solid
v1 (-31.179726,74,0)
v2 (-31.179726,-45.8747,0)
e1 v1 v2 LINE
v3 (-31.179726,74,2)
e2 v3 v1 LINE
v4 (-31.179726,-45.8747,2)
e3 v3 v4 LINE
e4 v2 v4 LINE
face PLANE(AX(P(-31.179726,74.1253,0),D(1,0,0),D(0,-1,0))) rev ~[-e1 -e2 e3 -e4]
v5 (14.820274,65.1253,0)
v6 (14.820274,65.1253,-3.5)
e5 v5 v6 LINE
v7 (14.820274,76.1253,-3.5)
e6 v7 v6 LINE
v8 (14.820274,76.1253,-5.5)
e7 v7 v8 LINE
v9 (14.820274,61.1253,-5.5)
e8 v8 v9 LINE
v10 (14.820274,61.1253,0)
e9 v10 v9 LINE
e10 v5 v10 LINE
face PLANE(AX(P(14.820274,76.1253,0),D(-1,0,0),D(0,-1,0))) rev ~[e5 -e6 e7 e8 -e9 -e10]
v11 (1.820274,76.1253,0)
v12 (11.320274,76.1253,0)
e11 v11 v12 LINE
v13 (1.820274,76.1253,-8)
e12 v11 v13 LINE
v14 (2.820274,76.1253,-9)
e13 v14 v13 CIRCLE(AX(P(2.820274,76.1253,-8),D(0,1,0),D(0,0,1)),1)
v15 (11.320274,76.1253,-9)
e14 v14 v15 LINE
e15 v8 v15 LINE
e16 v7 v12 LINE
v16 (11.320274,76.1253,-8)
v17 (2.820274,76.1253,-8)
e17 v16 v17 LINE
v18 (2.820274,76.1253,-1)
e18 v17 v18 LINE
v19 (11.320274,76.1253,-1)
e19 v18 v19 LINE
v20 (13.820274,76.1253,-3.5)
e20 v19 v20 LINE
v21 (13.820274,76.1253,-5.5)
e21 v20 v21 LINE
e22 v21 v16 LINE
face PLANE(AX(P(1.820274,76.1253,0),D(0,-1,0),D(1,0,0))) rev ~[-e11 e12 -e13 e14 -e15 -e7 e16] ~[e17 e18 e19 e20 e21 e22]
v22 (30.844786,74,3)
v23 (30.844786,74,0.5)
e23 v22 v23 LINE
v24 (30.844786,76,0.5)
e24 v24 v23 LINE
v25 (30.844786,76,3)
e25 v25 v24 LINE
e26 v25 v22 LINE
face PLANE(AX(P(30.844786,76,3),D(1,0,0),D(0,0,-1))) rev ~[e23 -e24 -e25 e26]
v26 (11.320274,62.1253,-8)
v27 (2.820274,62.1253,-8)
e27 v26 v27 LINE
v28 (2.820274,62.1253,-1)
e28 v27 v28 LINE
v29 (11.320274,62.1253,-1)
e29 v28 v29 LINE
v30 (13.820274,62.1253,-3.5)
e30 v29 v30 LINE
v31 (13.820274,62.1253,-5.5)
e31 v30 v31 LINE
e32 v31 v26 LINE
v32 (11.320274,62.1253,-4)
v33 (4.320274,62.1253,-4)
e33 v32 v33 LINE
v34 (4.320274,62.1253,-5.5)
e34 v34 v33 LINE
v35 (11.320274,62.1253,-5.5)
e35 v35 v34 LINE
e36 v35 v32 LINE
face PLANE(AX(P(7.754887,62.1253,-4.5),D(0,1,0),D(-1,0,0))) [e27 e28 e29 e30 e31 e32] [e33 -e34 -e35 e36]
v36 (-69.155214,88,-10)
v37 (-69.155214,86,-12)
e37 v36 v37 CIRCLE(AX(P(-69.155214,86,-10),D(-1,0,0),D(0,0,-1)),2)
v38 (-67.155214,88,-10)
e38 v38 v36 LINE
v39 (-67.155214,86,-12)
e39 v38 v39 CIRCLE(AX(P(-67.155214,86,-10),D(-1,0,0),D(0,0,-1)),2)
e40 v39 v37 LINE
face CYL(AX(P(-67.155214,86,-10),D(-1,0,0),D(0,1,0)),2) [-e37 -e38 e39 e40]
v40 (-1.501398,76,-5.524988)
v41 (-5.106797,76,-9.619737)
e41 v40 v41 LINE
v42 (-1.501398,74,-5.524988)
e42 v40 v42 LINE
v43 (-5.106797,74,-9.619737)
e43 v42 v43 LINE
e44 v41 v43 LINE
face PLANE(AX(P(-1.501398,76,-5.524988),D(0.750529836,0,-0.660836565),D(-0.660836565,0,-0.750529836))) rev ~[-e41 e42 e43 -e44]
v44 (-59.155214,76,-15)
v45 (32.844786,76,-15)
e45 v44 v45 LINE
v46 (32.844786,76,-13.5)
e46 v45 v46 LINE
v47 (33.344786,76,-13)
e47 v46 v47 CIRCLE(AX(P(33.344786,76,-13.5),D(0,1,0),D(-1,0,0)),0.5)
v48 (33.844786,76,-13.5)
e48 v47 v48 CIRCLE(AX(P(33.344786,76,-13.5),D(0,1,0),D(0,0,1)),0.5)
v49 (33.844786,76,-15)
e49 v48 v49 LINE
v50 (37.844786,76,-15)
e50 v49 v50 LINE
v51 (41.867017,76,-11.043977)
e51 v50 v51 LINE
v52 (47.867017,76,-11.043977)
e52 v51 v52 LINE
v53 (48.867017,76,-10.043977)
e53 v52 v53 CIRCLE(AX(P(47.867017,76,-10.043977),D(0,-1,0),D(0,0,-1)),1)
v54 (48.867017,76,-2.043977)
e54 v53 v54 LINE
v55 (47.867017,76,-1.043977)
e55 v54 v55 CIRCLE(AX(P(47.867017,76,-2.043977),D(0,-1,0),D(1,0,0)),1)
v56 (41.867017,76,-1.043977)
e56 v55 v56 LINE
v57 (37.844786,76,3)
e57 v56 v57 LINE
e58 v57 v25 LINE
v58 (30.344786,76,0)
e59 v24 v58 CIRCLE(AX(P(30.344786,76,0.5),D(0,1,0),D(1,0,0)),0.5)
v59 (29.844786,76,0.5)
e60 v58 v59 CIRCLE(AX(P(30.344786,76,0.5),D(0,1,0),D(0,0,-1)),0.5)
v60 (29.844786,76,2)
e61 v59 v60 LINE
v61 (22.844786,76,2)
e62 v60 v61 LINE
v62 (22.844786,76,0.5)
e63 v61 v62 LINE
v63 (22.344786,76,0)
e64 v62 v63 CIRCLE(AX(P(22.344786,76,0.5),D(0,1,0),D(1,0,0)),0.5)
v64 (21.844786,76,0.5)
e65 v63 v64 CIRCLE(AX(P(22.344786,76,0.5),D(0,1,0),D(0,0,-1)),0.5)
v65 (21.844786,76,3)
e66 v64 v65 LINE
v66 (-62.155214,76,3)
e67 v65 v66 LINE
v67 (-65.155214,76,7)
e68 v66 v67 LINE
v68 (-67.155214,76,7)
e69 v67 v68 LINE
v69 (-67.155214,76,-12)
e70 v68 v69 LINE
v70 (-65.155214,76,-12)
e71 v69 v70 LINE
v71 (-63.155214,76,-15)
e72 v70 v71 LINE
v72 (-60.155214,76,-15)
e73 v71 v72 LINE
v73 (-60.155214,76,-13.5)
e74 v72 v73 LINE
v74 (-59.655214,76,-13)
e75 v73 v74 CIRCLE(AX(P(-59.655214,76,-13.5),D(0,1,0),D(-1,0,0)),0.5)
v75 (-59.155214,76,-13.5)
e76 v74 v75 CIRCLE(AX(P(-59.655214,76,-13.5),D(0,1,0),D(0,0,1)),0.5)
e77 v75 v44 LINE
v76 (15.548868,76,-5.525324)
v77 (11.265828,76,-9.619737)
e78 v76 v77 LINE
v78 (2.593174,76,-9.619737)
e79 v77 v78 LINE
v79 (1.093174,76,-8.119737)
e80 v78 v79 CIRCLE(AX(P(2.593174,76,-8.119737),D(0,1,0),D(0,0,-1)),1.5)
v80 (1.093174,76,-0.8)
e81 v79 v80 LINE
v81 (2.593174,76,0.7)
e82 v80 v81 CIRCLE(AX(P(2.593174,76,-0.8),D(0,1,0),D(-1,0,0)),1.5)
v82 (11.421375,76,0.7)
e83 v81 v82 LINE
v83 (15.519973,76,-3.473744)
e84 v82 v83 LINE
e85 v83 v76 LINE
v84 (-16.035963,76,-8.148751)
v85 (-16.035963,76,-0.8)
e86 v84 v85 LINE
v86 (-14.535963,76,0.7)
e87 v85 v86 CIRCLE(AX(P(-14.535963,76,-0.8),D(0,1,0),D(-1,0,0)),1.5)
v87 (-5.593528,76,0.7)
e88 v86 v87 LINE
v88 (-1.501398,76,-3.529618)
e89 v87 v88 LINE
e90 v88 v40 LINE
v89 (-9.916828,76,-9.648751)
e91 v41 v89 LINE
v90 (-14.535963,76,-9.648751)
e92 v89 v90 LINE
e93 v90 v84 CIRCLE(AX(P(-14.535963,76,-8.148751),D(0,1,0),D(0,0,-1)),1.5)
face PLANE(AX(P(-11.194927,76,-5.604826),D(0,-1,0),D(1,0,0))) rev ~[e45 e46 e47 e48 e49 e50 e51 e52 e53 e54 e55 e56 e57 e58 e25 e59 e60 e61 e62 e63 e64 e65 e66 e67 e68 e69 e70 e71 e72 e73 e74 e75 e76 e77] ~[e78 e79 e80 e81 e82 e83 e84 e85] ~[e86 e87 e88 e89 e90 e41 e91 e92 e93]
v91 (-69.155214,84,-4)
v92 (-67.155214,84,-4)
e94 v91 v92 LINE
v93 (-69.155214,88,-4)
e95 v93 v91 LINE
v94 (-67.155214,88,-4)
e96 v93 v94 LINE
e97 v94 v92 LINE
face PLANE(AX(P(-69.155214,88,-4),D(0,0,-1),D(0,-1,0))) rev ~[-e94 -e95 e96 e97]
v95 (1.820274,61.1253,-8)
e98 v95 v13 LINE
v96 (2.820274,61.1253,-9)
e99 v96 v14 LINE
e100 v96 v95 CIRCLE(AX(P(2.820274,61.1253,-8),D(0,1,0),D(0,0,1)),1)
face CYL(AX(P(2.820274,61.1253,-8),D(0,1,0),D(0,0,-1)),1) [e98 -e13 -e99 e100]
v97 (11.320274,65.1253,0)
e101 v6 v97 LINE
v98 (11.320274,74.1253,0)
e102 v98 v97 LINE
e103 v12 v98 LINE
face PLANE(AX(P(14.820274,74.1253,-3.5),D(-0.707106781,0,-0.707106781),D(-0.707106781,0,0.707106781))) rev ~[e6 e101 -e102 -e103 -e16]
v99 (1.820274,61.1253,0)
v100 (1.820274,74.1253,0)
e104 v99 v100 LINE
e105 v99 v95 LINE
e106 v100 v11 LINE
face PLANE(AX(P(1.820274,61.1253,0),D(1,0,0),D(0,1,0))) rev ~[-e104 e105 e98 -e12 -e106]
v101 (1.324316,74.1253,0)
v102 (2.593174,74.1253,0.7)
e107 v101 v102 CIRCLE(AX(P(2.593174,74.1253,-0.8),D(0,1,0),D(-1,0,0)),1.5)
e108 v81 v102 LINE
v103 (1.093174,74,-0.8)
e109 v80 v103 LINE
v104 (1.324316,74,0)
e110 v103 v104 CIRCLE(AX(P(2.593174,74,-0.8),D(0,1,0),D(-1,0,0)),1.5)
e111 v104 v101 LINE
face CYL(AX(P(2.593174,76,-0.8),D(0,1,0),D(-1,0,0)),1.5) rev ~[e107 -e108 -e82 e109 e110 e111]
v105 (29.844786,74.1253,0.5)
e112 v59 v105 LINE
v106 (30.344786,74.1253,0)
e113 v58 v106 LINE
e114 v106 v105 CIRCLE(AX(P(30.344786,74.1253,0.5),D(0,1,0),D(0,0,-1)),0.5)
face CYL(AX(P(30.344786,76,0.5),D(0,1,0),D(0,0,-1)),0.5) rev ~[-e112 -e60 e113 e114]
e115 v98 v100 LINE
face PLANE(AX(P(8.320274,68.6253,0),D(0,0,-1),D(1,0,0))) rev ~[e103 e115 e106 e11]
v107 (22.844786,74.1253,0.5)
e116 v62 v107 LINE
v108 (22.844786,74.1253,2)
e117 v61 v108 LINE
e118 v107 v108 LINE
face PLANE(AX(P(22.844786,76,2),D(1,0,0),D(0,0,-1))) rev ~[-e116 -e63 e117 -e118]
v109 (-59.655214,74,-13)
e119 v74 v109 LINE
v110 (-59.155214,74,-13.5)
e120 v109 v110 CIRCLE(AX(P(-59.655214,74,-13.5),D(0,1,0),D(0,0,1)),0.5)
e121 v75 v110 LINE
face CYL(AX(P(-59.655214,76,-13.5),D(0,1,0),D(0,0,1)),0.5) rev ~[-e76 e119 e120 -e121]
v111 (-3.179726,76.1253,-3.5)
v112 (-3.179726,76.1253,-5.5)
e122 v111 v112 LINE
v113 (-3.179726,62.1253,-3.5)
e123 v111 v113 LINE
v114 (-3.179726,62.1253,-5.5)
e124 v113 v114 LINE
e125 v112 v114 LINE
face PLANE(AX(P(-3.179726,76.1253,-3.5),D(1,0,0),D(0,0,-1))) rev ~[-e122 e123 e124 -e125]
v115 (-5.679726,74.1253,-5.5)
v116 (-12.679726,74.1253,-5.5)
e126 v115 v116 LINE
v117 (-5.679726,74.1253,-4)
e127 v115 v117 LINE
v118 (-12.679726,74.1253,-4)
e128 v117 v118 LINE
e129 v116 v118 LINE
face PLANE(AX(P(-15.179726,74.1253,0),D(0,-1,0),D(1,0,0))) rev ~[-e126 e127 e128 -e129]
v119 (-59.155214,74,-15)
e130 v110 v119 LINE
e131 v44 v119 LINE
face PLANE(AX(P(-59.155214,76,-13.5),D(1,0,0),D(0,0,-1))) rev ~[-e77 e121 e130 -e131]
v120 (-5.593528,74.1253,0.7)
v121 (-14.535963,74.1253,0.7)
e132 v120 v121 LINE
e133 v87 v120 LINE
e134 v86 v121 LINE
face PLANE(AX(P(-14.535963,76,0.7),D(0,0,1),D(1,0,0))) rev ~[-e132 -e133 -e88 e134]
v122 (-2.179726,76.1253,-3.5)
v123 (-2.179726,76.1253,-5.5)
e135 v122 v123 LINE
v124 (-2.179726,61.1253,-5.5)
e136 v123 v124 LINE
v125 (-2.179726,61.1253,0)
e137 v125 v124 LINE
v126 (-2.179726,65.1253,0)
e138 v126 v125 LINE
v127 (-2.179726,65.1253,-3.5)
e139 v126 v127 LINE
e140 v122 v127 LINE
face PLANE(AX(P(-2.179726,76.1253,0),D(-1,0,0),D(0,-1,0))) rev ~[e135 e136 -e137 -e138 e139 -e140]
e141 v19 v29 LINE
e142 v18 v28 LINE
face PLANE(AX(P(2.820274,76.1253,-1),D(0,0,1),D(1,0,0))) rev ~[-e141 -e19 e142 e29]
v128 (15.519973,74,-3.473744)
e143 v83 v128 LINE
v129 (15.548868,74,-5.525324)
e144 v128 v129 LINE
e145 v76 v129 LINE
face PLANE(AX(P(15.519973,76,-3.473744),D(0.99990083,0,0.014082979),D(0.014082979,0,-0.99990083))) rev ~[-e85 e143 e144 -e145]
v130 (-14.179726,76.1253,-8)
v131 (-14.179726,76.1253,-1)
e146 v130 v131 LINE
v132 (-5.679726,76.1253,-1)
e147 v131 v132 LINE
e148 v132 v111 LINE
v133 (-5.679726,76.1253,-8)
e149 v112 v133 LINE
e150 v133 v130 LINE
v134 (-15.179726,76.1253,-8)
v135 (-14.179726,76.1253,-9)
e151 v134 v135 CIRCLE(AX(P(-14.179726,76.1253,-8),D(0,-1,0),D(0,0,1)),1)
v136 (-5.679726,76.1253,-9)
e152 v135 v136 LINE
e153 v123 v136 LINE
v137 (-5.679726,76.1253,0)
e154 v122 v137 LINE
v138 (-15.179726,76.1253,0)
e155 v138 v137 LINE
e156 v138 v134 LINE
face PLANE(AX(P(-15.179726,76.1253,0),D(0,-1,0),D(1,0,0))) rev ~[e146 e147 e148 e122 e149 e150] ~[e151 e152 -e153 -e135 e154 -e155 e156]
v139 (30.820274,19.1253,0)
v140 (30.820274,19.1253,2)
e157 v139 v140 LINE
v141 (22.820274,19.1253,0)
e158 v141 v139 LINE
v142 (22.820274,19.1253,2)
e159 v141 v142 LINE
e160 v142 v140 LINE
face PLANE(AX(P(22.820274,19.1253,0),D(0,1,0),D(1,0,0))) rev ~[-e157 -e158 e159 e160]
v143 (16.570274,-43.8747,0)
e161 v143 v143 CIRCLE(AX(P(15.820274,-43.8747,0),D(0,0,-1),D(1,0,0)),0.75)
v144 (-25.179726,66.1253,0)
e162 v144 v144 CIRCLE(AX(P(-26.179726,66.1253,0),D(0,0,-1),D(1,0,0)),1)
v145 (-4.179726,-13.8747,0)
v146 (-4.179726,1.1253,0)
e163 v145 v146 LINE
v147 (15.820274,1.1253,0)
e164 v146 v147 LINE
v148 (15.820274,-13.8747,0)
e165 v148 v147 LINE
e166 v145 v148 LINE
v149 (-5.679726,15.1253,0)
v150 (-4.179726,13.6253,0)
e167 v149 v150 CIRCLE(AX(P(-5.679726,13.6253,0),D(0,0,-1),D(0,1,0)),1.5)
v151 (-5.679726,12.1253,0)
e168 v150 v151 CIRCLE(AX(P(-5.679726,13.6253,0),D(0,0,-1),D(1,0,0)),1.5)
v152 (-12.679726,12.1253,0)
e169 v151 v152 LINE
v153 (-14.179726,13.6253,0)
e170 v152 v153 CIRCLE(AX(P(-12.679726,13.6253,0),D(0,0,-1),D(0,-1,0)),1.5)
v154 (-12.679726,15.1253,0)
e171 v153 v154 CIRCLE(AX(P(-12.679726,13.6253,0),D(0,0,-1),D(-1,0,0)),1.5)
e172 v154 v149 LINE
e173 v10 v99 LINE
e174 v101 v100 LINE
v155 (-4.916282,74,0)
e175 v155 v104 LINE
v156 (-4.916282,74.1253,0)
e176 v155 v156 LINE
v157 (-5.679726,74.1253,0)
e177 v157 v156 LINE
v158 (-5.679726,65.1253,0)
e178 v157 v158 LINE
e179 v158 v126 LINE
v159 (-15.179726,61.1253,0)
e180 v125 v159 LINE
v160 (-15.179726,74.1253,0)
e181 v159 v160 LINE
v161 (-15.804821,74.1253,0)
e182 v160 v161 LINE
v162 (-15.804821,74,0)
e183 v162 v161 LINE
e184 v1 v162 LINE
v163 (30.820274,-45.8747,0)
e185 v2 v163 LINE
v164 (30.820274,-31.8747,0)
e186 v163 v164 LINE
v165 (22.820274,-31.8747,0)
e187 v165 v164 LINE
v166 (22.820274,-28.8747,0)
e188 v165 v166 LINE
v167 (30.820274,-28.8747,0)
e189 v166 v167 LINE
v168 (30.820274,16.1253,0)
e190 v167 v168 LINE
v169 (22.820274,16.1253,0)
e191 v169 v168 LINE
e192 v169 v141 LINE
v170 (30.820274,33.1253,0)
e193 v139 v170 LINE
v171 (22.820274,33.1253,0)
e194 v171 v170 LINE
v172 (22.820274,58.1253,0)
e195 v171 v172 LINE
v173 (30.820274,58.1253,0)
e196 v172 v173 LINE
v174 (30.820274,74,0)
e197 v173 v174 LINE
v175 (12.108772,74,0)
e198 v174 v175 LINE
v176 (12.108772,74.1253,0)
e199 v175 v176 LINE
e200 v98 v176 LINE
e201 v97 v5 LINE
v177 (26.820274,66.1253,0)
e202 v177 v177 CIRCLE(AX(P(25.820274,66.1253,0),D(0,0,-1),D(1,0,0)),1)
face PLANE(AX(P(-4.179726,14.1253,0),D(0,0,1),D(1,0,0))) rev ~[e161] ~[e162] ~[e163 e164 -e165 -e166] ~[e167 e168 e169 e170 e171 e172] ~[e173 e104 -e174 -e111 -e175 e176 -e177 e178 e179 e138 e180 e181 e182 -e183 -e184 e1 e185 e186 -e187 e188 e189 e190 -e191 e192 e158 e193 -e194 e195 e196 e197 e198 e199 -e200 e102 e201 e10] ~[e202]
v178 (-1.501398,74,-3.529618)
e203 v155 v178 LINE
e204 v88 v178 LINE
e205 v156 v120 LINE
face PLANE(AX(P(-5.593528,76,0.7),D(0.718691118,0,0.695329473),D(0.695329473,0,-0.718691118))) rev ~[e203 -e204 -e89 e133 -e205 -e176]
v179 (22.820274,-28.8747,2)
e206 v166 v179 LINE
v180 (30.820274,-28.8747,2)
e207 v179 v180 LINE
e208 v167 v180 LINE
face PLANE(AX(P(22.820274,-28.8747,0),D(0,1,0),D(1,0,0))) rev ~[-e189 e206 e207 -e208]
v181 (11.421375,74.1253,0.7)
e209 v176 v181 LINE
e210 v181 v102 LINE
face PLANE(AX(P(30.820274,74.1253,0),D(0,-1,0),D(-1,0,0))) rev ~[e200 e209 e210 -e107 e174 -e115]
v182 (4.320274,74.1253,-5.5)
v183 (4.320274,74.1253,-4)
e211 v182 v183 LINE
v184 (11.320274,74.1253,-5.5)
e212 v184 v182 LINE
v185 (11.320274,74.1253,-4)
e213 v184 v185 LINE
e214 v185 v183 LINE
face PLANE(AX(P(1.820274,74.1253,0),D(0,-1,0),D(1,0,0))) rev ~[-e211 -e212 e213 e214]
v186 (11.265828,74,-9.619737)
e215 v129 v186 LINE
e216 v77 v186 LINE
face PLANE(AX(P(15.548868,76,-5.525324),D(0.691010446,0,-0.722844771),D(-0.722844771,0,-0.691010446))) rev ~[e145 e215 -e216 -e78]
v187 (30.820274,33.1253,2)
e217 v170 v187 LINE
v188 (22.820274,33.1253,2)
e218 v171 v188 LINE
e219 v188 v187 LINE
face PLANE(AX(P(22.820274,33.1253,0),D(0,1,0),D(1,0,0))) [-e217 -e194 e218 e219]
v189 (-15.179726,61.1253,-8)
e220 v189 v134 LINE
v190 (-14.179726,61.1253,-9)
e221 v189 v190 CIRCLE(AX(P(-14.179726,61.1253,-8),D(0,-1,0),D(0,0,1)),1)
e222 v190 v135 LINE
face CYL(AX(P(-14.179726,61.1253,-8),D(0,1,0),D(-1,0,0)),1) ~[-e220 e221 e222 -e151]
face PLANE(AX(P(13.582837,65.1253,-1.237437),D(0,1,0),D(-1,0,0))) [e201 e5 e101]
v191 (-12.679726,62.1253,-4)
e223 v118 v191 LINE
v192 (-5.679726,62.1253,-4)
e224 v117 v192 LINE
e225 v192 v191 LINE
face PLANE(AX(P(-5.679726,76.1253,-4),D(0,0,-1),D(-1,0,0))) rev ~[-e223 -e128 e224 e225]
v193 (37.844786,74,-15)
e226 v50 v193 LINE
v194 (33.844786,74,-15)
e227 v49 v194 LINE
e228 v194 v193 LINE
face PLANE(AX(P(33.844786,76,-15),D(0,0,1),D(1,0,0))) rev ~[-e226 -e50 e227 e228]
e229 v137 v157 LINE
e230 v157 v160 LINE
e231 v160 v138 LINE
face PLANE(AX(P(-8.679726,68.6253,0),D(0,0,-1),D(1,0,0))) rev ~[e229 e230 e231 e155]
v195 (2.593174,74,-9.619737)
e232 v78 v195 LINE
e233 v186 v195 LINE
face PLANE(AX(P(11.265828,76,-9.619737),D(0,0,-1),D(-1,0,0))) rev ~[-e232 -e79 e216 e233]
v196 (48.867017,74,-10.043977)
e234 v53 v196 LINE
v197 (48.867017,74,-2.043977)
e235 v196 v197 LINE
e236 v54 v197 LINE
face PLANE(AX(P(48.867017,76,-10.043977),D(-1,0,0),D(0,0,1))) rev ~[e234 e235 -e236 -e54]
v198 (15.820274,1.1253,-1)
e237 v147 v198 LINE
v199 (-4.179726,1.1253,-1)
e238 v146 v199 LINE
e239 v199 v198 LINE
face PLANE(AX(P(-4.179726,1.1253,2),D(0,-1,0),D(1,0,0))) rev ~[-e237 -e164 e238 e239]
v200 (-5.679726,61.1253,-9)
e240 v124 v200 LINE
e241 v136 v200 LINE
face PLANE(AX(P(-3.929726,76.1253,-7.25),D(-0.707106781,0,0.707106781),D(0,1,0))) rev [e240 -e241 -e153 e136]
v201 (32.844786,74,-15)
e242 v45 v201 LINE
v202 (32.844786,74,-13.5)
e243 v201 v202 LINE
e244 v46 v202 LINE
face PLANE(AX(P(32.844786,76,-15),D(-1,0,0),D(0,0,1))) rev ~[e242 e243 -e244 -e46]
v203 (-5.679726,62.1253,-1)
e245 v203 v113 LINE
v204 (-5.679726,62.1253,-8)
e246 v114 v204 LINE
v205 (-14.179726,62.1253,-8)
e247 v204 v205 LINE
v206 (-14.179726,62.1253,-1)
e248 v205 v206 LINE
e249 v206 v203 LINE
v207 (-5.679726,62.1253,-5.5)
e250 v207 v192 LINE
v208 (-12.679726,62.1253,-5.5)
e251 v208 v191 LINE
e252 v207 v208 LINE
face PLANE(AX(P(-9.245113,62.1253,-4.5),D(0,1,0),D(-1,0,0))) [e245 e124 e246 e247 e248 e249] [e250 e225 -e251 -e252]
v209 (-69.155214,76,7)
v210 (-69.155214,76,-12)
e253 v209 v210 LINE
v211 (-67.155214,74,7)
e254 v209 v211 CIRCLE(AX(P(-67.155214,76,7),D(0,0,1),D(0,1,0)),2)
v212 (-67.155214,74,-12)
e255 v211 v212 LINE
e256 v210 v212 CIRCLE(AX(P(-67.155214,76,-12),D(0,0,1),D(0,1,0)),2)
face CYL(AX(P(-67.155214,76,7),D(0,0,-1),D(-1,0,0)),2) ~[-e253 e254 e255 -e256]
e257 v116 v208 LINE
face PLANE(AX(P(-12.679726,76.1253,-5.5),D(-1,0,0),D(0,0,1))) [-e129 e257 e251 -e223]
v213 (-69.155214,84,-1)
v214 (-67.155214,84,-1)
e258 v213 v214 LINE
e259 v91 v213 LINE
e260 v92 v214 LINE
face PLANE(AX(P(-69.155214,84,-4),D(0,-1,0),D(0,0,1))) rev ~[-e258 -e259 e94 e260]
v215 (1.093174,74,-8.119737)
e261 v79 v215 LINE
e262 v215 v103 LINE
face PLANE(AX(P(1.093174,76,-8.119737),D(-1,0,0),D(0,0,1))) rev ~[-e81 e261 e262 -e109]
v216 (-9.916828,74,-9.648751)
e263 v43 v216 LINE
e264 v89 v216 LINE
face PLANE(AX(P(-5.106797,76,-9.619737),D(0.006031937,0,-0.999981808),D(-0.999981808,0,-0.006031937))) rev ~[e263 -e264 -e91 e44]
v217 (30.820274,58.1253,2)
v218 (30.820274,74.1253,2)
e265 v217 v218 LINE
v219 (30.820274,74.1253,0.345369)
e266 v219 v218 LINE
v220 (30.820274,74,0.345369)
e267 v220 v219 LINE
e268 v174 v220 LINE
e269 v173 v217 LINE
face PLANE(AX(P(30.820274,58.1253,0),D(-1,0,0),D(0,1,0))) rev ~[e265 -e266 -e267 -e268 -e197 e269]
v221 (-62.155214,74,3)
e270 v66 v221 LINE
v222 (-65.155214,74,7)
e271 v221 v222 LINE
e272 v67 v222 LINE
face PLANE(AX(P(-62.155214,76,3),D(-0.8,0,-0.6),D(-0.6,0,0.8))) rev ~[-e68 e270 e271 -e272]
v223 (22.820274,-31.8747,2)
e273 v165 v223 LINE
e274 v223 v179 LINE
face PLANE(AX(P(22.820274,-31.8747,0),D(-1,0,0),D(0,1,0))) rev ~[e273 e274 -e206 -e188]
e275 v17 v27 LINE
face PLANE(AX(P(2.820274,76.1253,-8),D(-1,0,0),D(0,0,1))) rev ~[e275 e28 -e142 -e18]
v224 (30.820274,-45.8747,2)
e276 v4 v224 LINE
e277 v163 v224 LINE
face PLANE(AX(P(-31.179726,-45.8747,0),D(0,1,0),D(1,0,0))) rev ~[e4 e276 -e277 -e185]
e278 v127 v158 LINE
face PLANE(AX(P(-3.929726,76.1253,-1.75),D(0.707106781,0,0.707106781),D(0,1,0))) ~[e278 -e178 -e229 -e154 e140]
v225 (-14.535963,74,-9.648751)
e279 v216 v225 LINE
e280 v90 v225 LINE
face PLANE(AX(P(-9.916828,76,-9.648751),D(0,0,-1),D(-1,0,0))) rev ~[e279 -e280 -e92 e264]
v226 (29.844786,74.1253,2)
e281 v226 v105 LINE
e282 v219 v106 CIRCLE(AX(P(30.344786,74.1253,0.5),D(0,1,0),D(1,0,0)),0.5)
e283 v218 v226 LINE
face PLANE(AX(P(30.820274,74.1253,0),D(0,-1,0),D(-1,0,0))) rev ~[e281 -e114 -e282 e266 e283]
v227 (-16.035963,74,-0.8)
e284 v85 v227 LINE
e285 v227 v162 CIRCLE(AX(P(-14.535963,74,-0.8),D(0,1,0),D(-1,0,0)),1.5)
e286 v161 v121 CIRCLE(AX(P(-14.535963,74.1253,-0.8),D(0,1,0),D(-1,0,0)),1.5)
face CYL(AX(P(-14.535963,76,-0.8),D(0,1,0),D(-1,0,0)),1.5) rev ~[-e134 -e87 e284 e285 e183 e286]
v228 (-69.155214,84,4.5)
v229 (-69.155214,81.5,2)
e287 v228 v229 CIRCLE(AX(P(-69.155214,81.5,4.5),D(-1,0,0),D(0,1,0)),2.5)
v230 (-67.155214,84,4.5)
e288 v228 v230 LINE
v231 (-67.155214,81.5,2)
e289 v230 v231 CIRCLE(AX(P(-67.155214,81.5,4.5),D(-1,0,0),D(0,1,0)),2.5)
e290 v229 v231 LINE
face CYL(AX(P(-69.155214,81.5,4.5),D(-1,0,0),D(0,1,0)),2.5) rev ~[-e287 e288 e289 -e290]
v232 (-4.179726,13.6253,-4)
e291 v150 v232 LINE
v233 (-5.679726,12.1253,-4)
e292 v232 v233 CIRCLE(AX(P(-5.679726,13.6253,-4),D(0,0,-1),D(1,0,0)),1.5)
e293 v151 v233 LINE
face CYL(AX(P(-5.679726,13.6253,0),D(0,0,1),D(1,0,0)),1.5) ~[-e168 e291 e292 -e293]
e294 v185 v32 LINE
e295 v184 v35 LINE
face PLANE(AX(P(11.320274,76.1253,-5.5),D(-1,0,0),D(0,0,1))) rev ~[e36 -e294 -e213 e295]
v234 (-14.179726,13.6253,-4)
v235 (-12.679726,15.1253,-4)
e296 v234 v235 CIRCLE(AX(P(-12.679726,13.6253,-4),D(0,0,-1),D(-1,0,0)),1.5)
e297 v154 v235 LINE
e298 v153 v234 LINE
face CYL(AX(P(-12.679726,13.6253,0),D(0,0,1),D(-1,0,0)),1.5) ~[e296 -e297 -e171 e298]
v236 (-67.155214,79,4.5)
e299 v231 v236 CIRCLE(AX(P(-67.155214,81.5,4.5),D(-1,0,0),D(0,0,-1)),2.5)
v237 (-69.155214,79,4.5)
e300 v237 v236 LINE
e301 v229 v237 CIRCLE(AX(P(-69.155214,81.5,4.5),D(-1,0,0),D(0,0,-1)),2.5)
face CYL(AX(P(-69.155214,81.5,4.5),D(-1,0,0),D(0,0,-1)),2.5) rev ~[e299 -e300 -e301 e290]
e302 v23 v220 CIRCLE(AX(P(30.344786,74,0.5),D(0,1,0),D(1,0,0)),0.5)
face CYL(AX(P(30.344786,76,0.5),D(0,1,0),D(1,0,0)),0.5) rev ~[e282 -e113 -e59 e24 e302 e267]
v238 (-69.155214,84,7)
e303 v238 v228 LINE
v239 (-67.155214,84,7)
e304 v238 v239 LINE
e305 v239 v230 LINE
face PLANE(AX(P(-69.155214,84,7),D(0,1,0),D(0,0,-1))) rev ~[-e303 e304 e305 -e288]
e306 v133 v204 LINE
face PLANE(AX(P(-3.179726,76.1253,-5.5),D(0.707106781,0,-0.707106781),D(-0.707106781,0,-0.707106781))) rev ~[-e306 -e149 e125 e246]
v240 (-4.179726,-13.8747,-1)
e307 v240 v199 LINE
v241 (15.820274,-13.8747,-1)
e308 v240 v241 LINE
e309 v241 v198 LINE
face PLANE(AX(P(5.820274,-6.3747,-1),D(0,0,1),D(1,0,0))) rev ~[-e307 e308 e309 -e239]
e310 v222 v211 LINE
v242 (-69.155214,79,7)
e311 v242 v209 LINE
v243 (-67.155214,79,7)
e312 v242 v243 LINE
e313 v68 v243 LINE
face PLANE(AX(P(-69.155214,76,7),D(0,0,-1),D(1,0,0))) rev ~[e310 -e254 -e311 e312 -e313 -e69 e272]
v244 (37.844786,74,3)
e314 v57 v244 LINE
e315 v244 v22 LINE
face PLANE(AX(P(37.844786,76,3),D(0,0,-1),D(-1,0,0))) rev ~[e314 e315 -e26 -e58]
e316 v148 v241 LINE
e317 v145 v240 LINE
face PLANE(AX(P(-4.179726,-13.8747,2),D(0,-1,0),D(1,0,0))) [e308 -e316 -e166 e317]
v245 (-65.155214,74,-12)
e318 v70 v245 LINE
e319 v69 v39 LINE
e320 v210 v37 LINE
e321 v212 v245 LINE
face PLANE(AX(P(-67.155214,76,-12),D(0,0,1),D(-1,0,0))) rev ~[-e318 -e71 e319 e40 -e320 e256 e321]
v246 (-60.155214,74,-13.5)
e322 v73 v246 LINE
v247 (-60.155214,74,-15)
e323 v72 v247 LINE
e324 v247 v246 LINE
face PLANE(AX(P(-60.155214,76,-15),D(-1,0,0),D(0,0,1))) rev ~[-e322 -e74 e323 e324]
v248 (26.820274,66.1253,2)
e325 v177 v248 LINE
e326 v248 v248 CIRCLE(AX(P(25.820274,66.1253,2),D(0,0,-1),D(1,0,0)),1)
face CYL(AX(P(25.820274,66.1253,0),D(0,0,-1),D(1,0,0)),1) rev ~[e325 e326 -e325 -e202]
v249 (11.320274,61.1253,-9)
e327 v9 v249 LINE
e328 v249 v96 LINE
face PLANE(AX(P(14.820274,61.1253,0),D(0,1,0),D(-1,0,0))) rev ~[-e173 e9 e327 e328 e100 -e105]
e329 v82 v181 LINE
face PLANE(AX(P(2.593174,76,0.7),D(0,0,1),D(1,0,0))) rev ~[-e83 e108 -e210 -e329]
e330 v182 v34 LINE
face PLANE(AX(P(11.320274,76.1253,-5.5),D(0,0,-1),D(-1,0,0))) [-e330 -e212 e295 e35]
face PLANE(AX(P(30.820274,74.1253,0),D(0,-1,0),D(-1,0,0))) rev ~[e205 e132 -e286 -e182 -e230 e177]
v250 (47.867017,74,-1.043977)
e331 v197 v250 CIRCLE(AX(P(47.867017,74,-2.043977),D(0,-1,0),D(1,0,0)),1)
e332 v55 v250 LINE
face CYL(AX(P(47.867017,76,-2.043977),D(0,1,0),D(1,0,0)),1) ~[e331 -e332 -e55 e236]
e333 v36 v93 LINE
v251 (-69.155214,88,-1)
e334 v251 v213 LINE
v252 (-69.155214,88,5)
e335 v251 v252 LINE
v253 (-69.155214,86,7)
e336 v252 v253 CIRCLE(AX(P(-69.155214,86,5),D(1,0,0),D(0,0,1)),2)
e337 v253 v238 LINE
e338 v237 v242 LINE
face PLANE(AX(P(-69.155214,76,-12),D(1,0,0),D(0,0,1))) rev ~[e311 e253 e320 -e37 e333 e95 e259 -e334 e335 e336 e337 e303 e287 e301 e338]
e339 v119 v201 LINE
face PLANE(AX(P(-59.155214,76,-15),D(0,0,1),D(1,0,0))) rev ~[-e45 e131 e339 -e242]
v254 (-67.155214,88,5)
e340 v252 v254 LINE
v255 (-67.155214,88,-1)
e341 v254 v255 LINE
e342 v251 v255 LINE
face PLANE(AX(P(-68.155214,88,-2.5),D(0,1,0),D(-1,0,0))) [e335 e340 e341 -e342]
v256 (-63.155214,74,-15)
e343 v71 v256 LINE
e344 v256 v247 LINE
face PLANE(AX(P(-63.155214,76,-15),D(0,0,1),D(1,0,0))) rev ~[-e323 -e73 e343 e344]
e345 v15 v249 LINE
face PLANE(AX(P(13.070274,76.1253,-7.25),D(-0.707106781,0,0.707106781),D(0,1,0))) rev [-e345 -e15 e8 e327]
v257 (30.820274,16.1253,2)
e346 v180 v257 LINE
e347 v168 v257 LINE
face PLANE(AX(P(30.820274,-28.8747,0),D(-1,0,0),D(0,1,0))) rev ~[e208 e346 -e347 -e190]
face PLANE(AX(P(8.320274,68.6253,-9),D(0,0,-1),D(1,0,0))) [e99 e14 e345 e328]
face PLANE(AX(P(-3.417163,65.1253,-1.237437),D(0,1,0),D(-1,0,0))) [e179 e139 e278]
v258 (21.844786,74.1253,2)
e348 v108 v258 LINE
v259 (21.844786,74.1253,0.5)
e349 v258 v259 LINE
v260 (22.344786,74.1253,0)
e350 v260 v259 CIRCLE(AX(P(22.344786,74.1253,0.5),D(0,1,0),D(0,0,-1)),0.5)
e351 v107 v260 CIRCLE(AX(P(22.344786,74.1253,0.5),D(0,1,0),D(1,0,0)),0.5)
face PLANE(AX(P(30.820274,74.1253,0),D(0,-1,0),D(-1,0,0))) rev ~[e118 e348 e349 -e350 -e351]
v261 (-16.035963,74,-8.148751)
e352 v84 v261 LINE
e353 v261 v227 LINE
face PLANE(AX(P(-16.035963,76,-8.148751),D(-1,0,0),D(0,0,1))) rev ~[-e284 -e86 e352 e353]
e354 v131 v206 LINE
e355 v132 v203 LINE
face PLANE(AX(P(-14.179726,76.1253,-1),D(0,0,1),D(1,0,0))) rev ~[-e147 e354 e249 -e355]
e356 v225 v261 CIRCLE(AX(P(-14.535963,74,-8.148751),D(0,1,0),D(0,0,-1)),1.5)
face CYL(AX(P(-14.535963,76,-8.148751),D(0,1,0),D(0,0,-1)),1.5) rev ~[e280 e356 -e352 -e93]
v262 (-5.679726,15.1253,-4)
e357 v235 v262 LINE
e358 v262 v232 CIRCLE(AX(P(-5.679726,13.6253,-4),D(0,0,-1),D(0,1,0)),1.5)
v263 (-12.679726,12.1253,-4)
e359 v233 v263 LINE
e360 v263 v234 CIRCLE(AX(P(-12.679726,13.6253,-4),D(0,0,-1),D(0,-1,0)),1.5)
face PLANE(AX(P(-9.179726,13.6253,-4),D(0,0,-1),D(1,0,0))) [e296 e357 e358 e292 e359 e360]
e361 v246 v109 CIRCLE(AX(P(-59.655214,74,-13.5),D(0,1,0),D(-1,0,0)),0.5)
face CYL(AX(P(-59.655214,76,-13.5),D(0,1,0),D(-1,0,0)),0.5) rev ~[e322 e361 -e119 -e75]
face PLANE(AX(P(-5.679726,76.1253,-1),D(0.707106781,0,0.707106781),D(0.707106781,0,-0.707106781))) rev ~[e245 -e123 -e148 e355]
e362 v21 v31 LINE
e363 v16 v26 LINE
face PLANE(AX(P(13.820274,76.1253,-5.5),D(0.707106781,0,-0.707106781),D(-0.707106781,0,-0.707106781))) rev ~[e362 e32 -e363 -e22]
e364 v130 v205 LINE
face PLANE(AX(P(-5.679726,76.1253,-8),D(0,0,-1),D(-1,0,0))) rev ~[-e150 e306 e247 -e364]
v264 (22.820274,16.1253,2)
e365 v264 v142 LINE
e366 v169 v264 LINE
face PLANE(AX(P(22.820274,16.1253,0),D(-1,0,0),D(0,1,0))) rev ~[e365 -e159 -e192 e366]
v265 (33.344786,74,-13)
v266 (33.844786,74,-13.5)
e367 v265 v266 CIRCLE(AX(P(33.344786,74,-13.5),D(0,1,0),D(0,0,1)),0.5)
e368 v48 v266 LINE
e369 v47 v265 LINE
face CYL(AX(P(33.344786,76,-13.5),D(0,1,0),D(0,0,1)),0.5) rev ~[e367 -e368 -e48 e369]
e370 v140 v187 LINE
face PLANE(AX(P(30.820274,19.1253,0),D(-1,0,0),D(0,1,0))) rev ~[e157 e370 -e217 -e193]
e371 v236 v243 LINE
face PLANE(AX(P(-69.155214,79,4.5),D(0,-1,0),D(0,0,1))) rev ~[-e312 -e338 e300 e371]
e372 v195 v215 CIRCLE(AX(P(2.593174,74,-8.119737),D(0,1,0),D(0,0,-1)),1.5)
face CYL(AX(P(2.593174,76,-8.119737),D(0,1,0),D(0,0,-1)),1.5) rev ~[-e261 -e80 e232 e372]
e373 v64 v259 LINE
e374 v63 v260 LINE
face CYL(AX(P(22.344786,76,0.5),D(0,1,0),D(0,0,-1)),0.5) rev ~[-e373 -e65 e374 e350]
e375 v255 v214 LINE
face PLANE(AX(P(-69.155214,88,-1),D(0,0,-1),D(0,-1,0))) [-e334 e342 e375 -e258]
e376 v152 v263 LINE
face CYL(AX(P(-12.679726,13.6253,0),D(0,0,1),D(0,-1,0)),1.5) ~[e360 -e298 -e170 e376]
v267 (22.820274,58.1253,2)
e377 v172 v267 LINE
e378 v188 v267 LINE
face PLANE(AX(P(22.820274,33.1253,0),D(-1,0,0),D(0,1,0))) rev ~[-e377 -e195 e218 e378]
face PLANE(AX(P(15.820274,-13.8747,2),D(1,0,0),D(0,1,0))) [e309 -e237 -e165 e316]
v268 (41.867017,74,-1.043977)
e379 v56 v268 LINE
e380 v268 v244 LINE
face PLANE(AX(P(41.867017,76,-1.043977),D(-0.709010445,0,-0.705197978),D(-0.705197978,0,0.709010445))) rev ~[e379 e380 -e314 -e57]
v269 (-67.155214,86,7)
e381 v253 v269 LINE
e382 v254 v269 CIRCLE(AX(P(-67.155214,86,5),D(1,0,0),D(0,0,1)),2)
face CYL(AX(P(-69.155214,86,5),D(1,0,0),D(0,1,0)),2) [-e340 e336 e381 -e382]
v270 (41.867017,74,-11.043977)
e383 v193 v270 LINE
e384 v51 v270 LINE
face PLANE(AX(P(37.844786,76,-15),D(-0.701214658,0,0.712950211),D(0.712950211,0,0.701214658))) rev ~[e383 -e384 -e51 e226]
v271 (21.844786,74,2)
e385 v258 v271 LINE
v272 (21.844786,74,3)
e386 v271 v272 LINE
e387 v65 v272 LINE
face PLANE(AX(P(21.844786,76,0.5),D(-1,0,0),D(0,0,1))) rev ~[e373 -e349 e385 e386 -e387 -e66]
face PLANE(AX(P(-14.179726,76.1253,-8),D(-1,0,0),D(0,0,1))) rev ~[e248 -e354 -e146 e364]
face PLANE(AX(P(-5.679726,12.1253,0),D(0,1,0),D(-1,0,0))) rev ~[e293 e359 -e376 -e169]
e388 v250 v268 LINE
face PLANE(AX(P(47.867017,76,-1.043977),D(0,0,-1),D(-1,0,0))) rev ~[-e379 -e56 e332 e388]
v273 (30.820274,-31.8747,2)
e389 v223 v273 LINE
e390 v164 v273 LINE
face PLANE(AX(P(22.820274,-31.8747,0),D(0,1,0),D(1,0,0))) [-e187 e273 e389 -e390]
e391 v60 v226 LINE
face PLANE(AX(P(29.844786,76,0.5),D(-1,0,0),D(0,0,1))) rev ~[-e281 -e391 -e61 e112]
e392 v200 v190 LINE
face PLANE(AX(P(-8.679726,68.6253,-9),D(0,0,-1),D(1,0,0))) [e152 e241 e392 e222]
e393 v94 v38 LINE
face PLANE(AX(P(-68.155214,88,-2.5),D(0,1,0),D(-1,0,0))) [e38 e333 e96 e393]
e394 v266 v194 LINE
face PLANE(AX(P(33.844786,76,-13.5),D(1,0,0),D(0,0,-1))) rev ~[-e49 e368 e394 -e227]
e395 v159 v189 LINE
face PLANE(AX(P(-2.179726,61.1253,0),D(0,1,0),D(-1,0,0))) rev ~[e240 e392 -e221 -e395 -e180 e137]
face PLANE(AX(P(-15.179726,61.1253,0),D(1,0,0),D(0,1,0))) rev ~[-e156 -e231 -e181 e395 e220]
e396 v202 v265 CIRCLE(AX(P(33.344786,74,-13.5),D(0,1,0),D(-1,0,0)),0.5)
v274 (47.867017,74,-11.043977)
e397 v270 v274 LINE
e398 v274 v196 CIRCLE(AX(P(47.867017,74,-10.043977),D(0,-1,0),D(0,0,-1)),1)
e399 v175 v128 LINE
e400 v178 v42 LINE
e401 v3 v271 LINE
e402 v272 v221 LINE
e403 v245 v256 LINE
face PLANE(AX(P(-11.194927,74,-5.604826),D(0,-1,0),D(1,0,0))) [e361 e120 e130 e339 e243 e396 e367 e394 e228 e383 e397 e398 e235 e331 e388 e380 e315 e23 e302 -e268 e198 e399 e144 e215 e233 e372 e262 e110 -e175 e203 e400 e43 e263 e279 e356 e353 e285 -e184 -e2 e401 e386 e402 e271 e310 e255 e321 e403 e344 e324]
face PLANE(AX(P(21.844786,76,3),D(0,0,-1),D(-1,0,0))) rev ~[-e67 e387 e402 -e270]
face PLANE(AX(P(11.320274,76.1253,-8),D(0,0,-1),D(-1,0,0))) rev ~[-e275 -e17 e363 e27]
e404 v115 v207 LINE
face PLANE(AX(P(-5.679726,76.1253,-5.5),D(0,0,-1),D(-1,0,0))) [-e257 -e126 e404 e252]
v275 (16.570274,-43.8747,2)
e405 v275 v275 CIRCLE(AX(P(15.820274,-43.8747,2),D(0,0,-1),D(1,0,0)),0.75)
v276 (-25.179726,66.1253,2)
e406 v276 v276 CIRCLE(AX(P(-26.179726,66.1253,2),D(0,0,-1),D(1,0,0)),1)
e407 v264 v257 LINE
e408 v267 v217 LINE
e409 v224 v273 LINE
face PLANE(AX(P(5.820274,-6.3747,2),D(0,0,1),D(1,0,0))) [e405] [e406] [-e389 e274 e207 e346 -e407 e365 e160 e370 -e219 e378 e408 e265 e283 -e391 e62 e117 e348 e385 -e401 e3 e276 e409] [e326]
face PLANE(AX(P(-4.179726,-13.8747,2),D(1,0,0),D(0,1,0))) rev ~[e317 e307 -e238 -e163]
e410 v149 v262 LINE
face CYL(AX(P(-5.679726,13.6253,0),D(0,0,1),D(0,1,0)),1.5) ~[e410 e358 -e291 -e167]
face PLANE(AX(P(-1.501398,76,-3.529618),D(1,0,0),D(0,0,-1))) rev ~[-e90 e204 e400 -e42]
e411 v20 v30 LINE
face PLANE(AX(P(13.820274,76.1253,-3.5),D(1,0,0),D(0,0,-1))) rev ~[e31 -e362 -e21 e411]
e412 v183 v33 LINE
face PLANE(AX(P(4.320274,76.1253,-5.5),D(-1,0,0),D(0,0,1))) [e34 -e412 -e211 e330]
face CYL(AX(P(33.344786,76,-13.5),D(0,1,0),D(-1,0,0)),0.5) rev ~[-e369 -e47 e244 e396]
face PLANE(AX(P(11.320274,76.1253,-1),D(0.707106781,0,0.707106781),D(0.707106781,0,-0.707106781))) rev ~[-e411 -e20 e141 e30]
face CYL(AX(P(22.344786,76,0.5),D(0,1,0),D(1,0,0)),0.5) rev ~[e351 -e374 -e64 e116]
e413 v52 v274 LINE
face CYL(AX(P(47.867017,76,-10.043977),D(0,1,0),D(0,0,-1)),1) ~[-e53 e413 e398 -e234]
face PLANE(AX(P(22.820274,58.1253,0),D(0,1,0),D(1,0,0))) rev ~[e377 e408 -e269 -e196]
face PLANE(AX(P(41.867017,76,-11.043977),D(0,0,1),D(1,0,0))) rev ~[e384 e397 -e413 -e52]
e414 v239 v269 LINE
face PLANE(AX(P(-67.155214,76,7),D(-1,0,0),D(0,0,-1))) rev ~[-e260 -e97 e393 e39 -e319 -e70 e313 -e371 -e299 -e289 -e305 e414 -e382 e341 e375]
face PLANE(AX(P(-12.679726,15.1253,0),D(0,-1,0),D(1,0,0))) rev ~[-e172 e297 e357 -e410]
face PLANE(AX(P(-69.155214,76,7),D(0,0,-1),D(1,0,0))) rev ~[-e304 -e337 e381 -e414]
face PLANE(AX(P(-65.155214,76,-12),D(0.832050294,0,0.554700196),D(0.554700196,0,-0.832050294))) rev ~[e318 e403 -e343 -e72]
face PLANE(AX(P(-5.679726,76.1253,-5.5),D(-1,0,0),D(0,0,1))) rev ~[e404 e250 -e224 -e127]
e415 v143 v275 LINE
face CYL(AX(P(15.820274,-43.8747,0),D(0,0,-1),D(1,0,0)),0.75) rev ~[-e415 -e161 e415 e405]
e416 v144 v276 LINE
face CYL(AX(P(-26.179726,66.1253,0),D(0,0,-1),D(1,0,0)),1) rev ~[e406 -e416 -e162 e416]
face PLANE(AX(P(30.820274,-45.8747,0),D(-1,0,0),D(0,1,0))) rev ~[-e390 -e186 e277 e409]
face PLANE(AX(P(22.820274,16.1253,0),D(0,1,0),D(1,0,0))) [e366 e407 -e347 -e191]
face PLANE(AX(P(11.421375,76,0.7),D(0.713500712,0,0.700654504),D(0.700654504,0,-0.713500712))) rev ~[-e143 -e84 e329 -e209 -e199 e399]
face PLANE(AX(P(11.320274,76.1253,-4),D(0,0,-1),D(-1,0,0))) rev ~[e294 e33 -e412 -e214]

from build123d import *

# Parameters (mm, degrees)
F0_W      = 8
F0_H      = 16
F0_H_2    = 14
F0_H_3    = 45
F1_DEPTH  = 2
F2_W      = 20
F2_H      = 15
F3_DEPTH  = 3
F5_DEPTH  = 4
F6_R      = 0.75
F7_DEPTH  = 25
F8_R      = 1
F9_DEPTH  = 25
F11_DEPTH = 9
F12_SIZE  = 3.5
F13_SIZE  = 3.5
F14_R     = 1
F15_R     = 1
F17_W     = 7
F17_H     = 1.5
F18_DEPTH = 14
F19_DEPTH = 2
F20_W     = 7
F20_H     = 1.5
F21_DEPTH = 14
F22_DEPTH = 2
F24_DEPTH = 9
F26_DEPTH = 9
F29_DEPTH = 2
F31_DEPTH = 12
F32_R     = 2
F33_R     = 2
F34_W     = 4
F34_H     = 3
F35_DEPTH = 25
F37_DEPTH = 25


# Not quite as in the source:
# - two fillets or chamfers of one size are made in one step


with BuildPart() as f1:
    # F0 (on Top) → F1 (new body)
    with BuildSketch(Plane.XY):
        Polygon((22.8202738762, 74.1253000498), (-31.1797261238, 74.1253000498), (-31.1797261238, -45.8746999502), (22.8202738762, -45.8746999502), (22.8202738762, -31.8746999502), (22.8202738762, -28.8746999502), (22.8202738762, 16.1253000498), (22.8202738762, 19.1253000498), (22.8202738762, 33.1253000498), (22.8202738762, 58.1253000498), align=None)
        with Locations((26.8202738762, 66.1253000498)):
            Rectangle(F0_W, F0_H)
        with Locations((26.8202738762, -38.8746999502)):
            Rectangle(F0_W, F0_H_2)
        with Locations((26.8202738762, 26.1253000498)):
            Rectangle(F0_W, F0_H_2)
        with Locations((26.8202738762, -6.3746999502)):
            Rectangle(F0_W, F0_H_3)
    extrude(amount=F1_DEPTH)

    # F2 (on face) → F3 (join)
    with BuildSketch(Plane.XY.offset(2)):
        with Locations((5.8202738762, -6.3746999502)):
            Rectangle(F2_W, F2_H)
    extrude(amount=-F3_DEPTH)

    # F4 (on face) → F5 (join)
    with BuildSketch(Plane(origin=(0, 0, 0), x_dir=(1, 0, 0), z_dir=(0, 0, -1))):
        with BuildLine():
            ThreePointArc((-4.1797261238, -13.6253000498), (-4.619065952, -12.564639878), (-5.6797261238, -12.1253000498))
            Line((-5.6797261238, -12.1253000498), (-12.6797261238, -12.1253000498))
            ThreePointArc((-12.6797261238, -12.1253000498), (-13.7403862956, -12.564639878), (-14.1797261238, -13.6253000498))
            ThreePointArc((-14.1797261238, -13.6253000498), (-13.7403862956, -14.6859602216), (-12.6797261238, -15.1253000498))
            Line((-12.6797261238, -15.1253000498), (-5.6797261238, -15.1253000498))
            ThreePointArc((-5.6797261238, -15.1253000498), (-4.619065952, -14.6859602216), (-4.1797261238, -13.6253000498))
        make_face()
    extrude(amount=F5_DEPTH)

    # F6 (on face) → F7 (cut)
    with BuildSketch(Plane(origin=(0, 0, 0), x_dir=(1, 0, 0), z_dir=(0, 0, -1))):
        with Locations((15.8202738762, 43.8746999502)):
            Circle(F6_R)
    extrude(amount=-F7_DEPTH, mode=Mode.SUBTRACT)

    # F8 (on face) → F9 (cut)
    with BuildSketch(Plane(origin=(0, 0, 0), x_dir=(1, 0, 0), z_dir=(0, 0, -1))):
        with Locations((25.8202738762, -66.1253000498)):
            Circle(F8_R)
        with Locations((-26.1797261238, -66.1253000498)):
            Circle(F8_R)
    extrude(amount=-F9_DEPTH, mode=Mode.SUBTRACT)

    # F10 (on face) → F11 (join)
    with BuildSketch(Plane(origin=(0, 0, 0), x_dir=(1, 0, 0), z_dir=(0, 0, -1))):
        Polygon((14.8202738762, -76.1253000498), (14.8202738762, -74.1253000498), (14.8202738762, -61.1253000498), (1.8202738762, -61.1253000498), (1.8202738762, -74.1253000498), (1.8202738762, -76.1253000498), align=None)
        Polygon((-15.1797261238, -61.1253000498), (-15.1797261238, -74.1253000498), (-15.1797261238, -76.1253000498), (-2.1797261238, -76.1253000498), (-2.1797261238, -74.1253000498), (-2.1797261238, -61.1253000498), align=None)
    extrude(amount=F11_DEPTH)

    # F12
    f12_edges = [f1.edges().sort_by_distance(p)[0] for p in [
        (14.820274, 68.6253, -9),
    ]]
    chamfer(f12_edges, length=F12_SIZE)

    # F13
    f13_edges = [f1.edges().sort_by_distance(p)[0] for p in [
        (14.820274, 75.1253, 0),
        (-2.179726, 75.1253, 0),
        (-2.179726, 68.6253, -9),
    ]]
    chamfer(f13_edges, length=F13_SIZE)

    # F14
    f14_edges = [f1.edges().sort_by_distance(p)[0] for p in [
        (1.820274, 68.6253, -9),
    ]]
    fillet(f14_edges, radius=F14_R)

    # F15
    f15_edges = [f1.edges().sort_by_distance(p)[0] for p in [
        (-15.179726, 68.6253, -9),
    ]]
    fillet(f15_edges, radius=F15_R)

    # F17 (on face) → F18 (cut)
    with BuildSketch(Plane(origin=(0, 76.1253000498, 0), x_dir=(-1, 0, 0), z_dir=(0, 1, 0))):
        Polygon((14.1797261238, -8), (14.1797261238, -1), (5.6797261238, -1), (3.1797261238, -3.5), (3.1797261238, -5.5), (5.6797261238, -8), align=None)
        with Locations((9.1797261238, -4.75)):
            Rectangle(F17_W, F17_H, mode=Mode.SUBTRACT)
    extrude(amount=-F18_DEPTH, mode=Mode.SUBTRACT)

    # F19 (cut): a face of the model
    f19_faces = [f1.faces().sort_by_distance(p)[0] for p in [
        (-9.1797261238, 76.1253000498, -4.75),
    ]]
    extrude(f19_faces, amount=-F19_DEPTH, mode=Mode.SUBTRACT)

    # F20 (on face) → F21 (cut)
    with BuildSketch(Plane(origin=(0, 76.1253000498, 0), x_dir=(-1, 0, 0), z_dir=(0, 1, 0))):
        Polygon((-2.8202738762, -8), (-2.8202738762, -4), (-2.8202738762, -1), (-11.3202738762, -1), (-13.8202738762, -3.5), (-13.8202738762, -5.5), (-11.3202738762, -8), align=None)
        with Locations((-7.8202738762, -4.75)):
            Rectangle(F20_W, F20_H, mode=Mode.SUBTRACT)
    extrude(amount=-F21_DEPTH, mode=Mode.SUBTRACT)

    # F22 (cut): a face of the model
    f22_faces = [f1.faces().sort_by_distance(p)[0] for p in [
        (7.8202738762, 76.1253000498, -4.75),
    ]]
    extrude(f22_faces, amount=-F22_DEPTH, mode=Mode.SUBTRACT)

    # F23 (on face) → F24 (cut)
    with BuildSketch(Plane(origin=(0, 74.1253000498, 0), x_dir=(-1, 0, 0), z_dir=(0, 1, 0))):
        Polygon((-11.3202738762, 0), (-14.8202738762, 0), (-14.8202738762, -3.5), align=None)
    extrude(amount=-F24_DEPTH, mode=Mode.SUBTRACT)

    # F25 (on face) → F26 (cut)
    with BuildSketch(Plane(origin=(0, 74.1253000498, 0), x_dir=(-1, 0, 0), z_dir=(0, 1, 0))):
        Polygon((2.1797261238, -3.5), (5.6797261238, 0), (2.1797261238, 0), align=None)
    extrude(amount=-F26_DEPTH, mode=Mode.SUBTRACT)

    # F28 (on offset) → F29 (join)
    with BuildSketch(Plane.XZ.offset(-76)):
        with BuildLine():
            Line((21.8447855255, 3), (1.8447855255, 3))
            Line((1.8447855255, 3), (0, 3))
            Line((0, 3), (-62.1552144745, 3))
            Line((-62.1552144745, 3), (-65.1552144745, 7))
            Line((-65.1552144745, 7), (-69.1552144745, 7))
            Line((-69.1552144745, 7), (-69.1552144745, -4.8977956176))
            Line((-69.1552144745, -4.8977956176), (-69.1552144745, -12))
            Line((-69.1552144745, -12), (-65.1552144745, -12))
            Line((-65.1552144745, -12), (-63.1552144745, -15))
            Line((-63.1552144745, -15), (-60.1552144745, -15))
            Line((-60.1552144745, -15), (-60.1552144745, -13.5))
            ThreePointArc((-60.1552144745, -13.5), (-60.0087678651, -13.1464466094), (-59.6552144745, -13))
            ThreePointArc((-59.6552144745, -13), (-59.3016610839, -13.1464466094), (-59.1552144745, -13.5))
            Line((-59.1552144745, -13.5), (-59.1552144745, -15))
            Line((-59.1552144745, -15), (32.8447855255, -15))
            Line((32.8447855255, -15), (32.8447855255, -13.5))
            ThreePointArc((32.8447855255, -13.5), (32.9912321349, -13.1464466094), (33.3447855255, -13))
            ThreePointArc((33.3447855255, -13), (33.6983389161, -13.1464466094), (33.8447855255, -13.5))
            Line((33.8447855255, -13.5), (33.8447855255, -15))
            Line((33.8447855255, -15), (37.8447855255, -15))
            Line((37.8447855255, -15), (41.8670170307, -11.0439766385))
            Line((41.8670170307, -11.0439766385), (47.8670170307, -11.0439766385))
            ThreePointArc((47.8670170307, -11.0439766385), (48.5741238119, -10.7510834197), (48.8670170307, -10.0439766385))
            Line((48.8670170307, -10.0439766385), (48.8670170307, -6.0439766385))
            Line((48.8670170307, -6.0439766385), (48.8670170307, -2.0439766385))
            ThreePointArc((48.8670170307, -2.0439766385), (48.5741238119, -1.3368698573), (47.8670170307, -1.0439766385))
            Line((47.8670170307, -1.0439766385), (41.8670170307, -1.0439766385))
            Line((41.8670170307, -1.0439766385), (37.8447855255, 3))
            Line((37.8447855255, 3), (30.8447855255, 3))
            Line((30.8447855255, 3), (30.8447855255, 0.5))
            ThreePointArc((30.8447855255, 0.5), (30.6983389161, 0.1464466094), (30.3447855255, 0))
            ThreePointArc((30.3447855255, 0), (29.9912321349, 0.1464466094), (29.8447855255, 0.5))
            Line((29.8447855255, 0.5), (29.8447855255, 2))
            Line((29.8447855255, 2), (22.8447855255, 2))
            Line((22.8447855255, 2), (22.8447855255, 0.5))
            ThreePointArc((22.8447855255, 0.5), (22.6983389161, 0.1464466094), (22.3447855255, 0))
            ThreePointArc((22.3447855255, 0), (21.9912321349, 0.1464466094), (21.8447855255, 0.5))
            Line((21.8447855255, 0.5), (21.8447855255, 3))
        make_face()
        with BuildLine():
            Line((-5.1067974085, -9.6197371359), (-9.916828014, -9.6487514675))
            Line((-9.916828014, -9.6487514675), (-14.5359628499, -9.6487514675))
            ThreePointArc((-14.5359628499, -9.6487514675), (-15.5966230216, -9.2094116392), (-16.0359628499, -8.1487514675))
            Line((-16.0359628499, -8.1487514675), (-16.0359628499, -4.194740206))
            Line((-16.0359628499, -4.194740206), (-16.0359628499, -0.8))
            ThreePointArc((-16.0359628499, -0.8), (-15.5966230216, 0.2606601718), (-14.5359628499, 0.7))
            Line((-14.5359628499, 0.7), (-9.4512412325, 0.7))
            Line((-9.4512412325, 0.7), (-5.5935280398, 0.7))
            Line((-5.5935280398, 0.7), (-1.5013976704, -3.5296175629))
            Line((-1.5013976704, -3.5296175629), (-1.5013976704, -5.5249878205))
            Line((-1.5013976704, -5.5249878205), (-5.1067974085, -9.6197371359))
        make_face(mode=Mode.SUBTRACT)
        with BuildLine():
            Line((15.5488683626, -5.5253235623), (11.2658282742, -9.6197371359))
            Line((11.2658282742, -9.6197371359), (2.5931737488, -9.6197371359))
            ThreePointArc((2.5931737488, -9.6197371359), (1.532513577, -9.1803973077), (1.0931737488, -8.1197371359))
            Line((1.0931737488, -8.1197371359), (1.0931737488, -4.0044868365))
            Line((1.0931737488, -4.0044868365), (1.0931737488, -0.8))
            ThreePointArc((1.0931737488, -0.8), (1.532513577, 0.2606601718), (2.5931737488, 0.7))
            Line((2.5931737488, 0.7), (7.3360428214, 0.7))
            Line((7.3360428214, 0.7), (11.4213749766, 0.7))
            Line((11.4213749766, 0.7), (15.5199731484, -3.473744262))
            Line((15.5199731484, -3.473744262), (15.5488683626, -5.5253235623))
        make_face(mode=Mode.SUBTRACT)
    extrude(amount=F29_DEPTH)

    # F30 (on face) → F31 (join)
    with BuildSketch(Plane(origin=(0, 76, 0), x_dir=(-1, 0, 0), z_dir=(0, 1, 0))):
        Polygon((67.1552144745, 7), (67.1552144745, -5.6737242267), (67.1552144745, -12), (69.1552144745, -12), (69.1552144745, 7), align=None)
    extrude(amount=F31_DEPTH)

    # F32
    f32_edges = [f1.edges().sort_by_distance(p)[0] for p in [
        (-68.155214, 88, -12),
        (-68.155214, 88, 7),
    ]]
    fillet(f32_edges, radius=F32_R)

    # F33
    f33_edges = [f1.edges().sort_by_distance(p)[0] for p in [
        (-69.155214, 74, -2.5),
    ]]
    fillet(f33_edges, radius=F33_R)

    # F34 (on face) → F35 (cut)
    with BuildSketch(Plane(origin=(-69.1552144745, 0, 0), x_dir=(0, -1, 0), z_dir=(-1, 0, 0))):
        with Locations((-86, -2.5)):
            Rectangle(F34_W, F34_H)
    extrude(amount=-F35_DEPTH, mode=Mode.SUBTRACT)

    # F36 (on face) → F37 (cut)
    with BuildSketch(Plane(origin=(-69.1552144745, 0, 0), x_dir=(0, -1, 0), z_dir=(-1, 0, 0))):
        with BuildLine():
            Line((-79, 7), (-84, 7))
            Line((-84, 7), (-84, 4.5))
            ThreePointArc((-84, 4.5), (-83.267766953, 2.732233047), (-81.5, 2))
            ThreePointArc((-81.5, 2), (-79.732233047, 2.732233047), (-79, 4.5))
            Line((-79, 4.5), (-79, 7))
        make_face()
    extrude(amount=-F37_DEPTH, mode=Mode.SUBTRACT)


solid = f1.part
